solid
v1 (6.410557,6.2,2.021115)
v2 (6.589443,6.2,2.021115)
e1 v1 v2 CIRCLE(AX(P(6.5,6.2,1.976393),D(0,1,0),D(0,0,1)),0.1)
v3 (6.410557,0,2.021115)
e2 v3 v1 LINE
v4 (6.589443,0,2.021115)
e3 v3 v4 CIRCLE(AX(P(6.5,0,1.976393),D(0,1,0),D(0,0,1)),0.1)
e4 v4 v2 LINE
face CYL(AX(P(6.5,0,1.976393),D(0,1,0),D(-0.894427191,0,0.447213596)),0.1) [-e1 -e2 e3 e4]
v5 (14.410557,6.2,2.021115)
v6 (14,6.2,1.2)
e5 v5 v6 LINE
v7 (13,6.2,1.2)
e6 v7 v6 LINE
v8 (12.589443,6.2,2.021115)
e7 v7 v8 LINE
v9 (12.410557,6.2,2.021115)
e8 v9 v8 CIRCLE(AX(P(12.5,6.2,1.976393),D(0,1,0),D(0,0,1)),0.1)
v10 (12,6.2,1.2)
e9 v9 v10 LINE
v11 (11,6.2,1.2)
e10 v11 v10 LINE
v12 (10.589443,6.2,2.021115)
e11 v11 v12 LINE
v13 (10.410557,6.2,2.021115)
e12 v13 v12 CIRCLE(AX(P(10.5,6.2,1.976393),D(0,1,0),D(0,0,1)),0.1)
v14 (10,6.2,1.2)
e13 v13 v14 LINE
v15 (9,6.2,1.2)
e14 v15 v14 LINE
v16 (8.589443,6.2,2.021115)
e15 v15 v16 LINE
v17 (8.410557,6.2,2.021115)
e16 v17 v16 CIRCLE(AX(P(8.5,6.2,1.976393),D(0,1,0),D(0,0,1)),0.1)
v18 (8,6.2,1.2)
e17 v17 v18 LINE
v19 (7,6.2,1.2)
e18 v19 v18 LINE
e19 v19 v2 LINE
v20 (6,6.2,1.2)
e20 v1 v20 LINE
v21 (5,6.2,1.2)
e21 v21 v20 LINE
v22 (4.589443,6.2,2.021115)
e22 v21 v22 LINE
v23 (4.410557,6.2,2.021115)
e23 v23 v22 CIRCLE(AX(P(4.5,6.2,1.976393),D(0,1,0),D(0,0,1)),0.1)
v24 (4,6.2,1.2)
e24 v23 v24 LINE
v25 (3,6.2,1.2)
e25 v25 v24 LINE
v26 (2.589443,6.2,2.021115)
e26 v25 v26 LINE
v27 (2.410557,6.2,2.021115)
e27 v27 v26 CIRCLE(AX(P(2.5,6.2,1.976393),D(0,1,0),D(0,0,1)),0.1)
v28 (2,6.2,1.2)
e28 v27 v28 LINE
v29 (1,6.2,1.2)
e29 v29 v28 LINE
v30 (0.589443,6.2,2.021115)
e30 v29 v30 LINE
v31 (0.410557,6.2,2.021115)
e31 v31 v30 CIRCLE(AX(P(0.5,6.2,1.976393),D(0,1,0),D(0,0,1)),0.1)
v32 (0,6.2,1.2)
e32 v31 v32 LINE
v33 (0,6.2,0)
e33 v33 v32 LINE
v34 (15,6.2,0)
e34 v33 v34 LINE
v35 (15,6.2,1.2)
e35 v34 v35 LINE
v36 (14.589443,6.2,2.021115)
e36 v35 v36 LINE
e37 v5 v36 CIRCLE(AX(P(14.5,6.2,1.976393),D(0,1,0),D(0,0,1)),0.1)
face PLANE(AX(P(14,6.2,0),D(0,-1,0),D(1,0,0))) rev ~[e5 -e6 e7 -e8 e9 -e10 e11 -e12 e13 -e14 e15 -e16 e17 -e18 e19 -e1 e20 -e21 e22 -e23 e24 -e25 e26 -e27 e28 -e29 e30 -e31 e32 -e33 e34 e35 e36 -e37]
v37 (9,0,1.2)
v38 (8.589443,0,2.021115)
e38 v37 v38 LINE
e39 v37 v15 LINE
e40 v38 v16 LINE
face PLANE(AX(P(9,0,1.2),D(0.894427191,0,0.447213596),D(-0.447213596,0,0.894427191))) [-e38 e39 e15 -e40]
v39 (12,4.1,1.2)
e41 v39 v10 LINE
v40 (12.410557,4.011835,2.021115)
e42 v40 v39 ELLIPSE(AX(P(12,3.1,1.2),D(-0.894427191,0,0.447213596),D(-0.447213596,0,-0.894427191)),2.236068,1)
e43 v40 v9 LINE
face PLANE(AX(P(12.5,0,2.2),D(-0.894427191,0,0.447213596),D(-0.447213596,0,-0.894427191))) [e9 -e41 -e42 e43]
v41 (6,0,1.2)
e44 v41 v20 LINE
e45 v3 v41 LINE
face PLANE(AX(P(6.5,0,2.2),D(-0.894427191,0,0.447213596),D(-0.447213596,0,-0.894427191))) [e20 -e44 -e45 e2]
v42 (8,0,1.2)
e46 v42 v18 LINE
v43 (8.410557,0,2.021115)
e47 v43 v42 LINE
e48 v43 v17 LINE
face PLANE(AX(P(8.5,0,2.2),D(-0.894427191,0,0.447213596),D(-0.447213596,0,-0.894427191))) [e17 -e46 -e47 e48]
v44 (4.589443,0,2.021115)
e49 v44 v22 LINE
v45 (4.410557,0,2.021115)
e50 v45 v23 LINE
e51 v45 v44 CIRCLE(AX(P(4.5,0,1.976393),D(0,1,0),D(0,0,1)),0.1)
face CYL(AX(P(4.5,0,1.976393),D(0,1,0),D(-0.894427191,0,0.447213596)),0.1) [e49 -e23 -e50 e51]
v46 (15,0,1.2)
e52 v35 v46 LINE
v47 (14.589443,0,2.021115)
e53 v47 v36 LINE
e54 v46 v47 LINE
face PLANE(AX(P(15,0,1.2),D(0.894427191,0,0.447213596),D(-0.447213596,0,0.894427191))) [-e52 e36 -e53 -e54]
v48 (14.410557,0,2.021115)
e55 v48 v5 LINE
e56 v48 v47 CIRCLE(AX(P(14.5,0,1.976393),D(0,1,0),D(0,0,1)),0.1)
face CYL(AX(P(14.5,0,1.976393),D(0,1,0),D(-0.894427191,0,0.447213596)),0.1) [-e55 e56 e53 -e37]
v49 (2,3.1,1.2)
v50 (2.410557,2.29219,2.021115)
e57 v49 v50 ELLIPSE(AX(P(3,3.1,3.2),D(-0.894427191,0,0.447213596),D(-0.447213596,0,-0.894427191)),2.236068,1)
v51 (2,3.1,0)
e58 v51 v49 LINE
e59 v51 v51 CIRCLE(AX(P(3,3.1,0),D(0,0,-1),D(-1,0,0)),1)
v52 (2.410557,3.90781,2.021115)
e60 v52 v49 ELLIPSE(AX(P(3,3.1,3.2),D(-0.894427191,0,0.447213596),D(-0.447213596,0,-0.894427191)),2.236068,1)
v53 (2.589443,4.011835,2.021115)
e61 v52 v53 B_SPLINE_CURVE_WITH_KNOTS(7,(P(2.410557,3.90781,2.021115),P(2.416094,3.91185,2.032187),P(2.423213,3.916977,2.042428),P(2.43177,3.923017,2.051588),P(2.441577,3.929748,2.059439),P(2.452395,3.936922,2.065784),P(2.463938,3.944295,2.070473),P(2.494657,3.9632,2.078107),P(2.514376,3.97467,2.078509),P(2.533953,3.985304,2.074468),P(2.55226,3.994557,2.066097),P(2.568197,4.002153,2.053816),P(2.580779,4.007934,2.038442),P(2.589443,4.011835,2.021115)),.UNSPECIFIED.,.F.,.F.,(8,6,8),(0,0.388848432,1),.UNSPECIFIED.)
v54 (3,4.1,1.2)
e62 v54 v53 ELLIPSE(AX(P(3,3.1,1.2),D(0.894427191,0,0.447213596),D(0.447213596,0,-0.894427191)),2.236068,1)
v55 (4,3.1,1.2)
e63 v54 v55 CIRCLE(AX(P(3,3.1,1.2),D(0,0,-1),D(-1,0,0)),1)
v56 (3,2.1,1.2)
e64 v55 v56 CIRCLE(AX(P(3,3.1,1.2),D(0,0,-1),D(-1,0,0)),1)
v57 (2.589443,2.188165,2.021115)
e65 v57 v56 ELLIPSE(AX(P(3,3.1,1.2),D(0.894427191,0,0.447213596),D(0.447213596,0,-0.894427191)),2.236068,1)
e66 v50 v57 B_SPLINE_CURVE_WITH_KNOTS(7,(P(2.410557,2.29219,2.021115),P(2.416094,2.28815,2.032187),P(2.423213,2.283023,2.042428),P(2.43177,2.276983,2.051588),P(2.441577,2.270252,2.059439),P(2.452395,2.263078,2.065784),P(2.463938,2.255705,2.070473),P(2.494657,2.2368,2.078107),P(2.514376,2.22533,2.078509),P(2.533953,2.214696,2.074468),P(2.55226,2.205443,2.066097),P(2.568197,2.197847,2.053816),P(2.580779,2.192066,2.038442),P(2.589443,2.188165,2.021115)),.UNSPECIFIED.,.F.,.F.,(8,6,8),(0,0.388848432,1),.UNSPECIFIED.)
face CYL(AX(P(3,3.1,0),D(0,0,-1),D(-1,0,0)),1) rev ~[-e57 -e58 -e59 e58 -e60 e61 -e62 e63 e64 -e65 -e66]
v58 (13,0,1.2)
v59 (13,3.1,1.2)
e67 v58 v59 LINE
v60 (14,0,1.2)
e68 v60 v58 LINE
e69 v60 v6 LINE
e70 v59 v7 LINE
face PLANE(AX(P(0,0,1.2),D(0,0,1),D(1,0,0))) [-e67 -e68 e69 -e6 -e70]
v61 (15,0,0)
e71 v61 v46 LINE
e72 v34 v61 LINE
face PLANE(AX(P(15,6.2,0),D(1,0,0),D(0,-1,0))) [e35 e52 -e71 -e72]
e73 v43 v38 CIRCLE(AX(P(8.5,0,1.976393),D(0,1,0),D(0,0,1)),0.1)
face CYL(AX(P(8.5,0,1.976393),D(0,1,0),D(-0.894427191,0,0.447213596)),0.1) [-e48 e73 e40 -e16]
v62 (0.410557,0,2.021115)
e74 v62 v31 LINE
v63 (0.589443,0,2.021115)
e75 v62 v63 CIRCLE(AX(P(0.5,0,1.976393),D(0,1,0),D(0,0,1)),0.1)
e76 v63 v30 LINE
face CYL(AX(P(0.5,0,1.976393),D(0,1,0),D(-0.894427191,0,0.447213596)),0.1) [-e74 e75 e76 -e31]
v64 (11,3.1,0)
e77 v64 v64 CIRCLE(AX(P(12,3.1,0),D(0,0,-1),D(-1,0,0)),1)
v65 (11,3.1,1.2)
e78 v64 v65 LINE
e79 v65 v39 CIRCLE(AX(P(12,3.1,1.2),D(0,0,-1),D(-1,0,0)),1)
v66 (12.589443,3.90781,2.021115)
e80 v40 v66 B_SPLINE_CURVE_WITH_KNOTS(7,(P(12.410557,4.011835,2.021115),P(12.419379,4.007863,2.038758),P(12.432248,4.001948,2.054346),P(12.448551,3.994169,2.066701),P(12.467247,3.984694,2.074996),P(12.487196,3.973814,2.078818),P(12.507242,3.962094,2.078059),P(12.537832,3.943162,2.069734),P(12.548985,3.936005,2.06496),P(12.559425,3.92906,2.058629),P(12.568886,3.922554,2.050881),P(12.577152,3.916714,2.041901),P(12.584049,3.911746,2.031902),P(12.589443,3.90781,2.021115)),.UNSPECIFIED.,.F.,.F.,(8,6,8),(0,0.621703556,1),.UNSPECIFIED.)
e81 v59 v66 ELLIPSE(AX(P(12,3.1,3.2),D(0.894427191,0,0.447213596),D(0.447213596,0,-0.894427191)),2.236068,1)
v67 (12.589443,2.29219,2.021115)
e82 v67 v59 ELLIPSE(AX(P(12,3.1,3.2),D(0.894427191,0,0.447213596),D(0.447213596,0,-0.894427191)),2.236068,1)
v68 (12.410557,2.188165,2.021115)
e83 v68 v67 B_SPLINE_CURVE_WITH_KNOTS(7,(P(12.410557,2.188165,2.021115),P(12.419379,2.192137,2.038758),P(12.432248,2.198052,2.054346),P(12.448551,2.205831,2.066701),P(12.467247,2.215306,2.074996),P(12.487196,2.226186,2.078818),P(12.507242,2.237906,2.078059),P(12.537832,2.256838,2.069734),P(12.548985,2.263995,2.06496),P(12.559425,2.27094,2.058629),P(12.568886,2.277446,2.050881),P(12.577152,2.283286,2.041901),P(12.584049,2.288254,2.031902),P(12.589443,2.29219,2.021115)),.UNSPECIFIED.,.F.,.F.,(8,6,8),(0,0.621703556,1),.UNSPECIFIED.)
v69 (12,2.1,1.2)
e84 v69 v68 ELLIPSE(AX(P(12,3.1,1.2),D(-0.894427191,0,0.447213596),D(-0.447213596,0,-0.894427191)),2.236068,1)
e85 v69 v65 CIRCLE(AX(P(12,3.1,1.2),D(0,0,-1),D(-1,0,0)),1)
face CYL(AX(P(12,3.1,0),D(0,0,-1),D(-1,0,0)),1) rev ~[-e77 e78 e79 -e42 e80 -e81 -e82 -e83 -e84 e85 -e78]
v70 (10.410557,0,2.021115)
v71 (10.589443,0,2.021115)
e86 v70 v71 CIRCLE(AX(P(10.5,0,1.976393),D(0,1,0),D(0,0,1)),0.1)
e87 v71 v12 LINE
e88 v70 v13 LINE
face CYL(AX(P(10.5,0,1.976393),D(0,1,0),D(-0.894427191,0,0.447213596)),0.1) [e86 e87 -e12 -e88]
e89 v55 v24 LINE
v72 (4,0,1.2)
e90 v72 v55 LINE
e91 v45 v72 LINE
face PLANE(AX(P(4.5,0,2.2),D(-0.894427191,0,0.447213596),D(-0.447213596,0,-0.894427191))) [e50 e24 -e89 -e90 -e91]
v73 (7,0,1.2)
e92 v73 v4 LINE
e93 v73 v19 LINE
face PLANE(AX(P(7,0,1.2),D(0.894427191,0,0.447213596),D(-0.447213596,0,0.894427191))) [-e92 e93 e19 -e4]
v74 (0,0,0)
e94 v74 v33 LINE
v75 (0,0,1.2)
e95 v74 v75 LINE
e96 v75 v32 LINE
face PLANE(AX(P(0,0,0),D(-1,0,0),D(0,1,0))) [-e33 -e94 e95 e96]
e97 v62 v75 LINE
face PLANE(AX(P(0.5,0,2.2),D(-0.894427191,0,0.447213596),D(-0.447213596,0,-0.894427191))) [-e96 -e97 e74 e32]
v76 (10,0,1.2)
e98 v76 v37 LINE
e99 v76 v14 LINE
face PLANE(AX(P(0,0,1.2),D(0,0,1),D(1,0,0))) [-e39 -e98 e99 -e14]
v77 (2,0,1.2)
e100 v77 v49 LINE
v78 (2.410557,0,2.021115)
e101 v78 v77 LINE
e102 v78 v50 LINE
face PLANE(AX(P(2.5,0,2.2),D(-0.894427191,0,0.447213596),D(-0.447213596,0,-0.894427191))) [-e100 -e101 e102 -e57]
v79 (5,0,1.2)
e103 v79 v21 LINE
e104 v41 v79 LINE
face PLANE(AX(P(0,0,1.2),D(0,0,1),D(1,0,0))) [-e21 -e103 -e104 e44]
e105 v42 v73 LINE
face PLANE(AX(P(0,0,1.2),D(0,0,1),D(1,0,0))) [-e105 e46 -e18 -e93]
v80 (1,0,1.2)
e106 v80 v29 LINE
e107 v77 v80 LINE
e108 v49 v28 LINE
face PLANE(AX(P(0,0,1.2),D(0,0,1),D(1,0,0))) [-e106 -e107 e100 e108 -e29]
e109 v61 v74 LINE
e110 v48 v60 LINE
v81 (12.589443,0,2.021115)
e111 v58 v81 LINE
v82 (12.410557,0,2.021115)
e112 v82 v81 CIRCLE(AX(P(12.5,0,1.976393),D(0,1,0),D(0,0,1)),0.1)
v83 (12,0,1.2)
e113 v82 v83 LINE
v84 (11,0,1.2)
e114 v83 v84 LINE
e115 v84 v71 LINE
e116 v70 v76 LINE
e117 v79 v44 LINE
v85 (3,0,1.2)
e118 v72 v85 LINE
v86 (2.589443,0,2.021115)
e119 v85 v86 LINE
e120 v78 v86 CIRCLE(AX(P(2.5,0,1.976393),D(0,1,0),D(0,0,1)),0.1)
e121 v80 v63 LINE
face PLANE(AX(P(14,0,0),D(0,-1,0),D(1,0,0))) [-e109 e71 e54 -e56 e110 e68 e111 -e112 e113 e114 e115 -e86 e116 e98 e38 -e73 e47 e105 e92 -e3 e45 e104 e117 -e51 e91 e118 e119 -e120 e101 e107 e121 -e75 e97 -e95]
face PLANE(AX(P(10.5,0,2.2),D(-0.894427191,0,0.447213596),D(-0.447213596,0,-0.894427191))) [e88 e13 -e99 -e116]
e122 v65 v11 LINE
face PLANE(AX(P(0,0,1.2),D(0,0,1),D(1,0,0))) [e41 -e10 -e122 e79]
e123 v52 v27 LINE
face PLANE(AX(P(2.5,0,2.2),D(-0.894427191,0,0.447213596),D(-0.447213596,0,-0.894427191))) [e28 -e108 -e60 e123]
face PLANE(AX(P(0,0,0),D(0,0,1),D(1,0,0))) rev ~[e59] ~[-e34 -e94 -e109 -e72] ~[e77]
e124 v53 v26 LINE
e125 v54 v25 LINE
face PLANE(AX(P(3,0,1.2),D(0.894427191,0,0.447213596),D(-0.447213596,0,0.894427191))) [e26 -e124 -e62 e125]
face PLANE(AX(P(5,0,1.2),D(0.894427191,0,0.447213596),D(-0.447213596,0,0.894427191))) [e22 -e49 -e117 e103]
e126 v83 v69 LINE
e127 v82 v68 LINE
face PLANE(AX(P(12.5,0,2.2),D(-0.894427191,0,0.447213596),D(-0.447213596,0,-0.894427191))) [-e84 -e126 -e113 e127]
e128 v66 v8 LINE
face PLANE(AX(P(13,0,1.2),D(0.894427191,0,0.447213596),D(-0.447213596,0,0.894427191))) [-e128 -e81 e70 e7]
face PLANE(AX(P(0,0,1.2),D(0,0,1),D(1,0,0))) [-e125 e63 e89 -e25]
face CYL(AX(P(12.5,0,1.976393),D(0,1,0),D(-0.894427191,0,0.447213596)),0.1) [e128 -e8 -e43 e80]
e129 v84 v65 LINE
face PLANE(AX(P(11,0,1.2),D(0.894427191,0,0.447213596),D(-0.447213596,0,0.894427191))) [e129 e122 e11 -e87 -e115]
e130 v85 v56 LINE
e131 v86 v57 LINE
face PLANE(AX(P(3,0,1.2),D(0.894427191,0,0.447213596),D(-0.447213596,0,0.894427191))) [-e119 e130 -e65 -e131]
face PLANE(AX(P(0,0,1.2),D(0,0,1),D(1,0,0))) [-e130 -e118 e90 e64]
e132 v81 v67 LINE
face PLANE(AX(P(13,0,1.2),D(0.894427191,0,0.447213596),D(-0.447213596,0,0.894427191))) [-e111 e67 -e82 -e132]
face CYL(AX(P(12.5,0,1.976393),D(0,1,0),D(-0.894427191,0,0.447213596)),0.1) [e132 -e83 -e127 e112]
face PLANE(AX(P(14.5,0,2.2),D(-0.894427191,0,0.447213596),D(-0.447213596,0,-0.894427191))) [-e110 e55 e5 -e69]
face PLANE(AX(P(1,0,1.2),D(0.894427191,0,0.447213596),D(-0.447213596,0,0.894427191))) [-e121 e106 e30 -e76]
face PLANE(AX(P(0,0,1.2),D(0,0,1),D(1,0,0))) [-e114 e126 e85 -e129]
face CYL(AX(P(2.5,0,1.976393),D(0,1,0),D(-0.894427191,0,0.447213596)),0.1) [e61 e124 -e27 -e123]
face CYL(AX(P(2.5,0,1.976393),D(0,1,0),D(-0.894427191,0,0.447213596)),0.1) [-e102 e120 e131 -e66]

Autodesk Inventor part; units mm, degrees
ref_plane "YZ Plane" through (0, 0, 0) normal (1, 0, 0) x (0, 1, 0)
ref_plane "XZ Plane" through (0, 0, 0) normal (0, 1, 0) x (-1, 0, 0)
ref_plane "XY Plane" through (0, 0, 0) normal (0, 0, 1) x (1, 0, 0)
sketch "Sketch1" plane through (0, 0, 0) normal (0, 0, 1) x (1, 0, 0)
  line L0 (0, 0) -> (0, 6.2)
  line L1 (0, 6.2) -> (15, 6.2)
  line L2 (15, 6.2) -> (15, 0)
  line L3 (15, 0) -> (0, 0)
  dimension "d0" = 6.2
  dimension "d1" = 15
extrude "Extrusion1" add sketch "Sketch1" along normal blind 1.2
sketch "Sketch2" plane through (0, 0, 0) normal (0, -1, 0) x (1, 0, 0)
  line L0 (0, 0) -> (0, 1.2) projected
  line L1 (0, 1.2) -> (0.5, 1.2)
  line L2 (15, 1.2) -> (0, 1.2) projected
  line L3 (0.5, 1.2) -> (0.5, 2.2)
  line L4 (0.5, 2.2) -> (0, 1.2)
  line L5 (0.5, 1.2) -> (1, 1.2)
  line L6 (1, 1.2) -> (0.5, 2.2)
  dimension "d4" = 0.5
  dimension "d5" = 1
  dimension "d6" = 0.5
extrude "Extrusion2" add sketch "Sketch2" against normal blind 6.2
fillet "Fillet1" radius 0.1 1 edges at (0.5, 3.1, 2.2)
pattern_linear "Rectangular Pattern1" count 8 spacing 2 along (1, 0, 0) of "Fillet1", "Extrusion2"
sketch "Sketch3" plane through (0, 0, 0) normal (0, 0, -1) x (-1, 0, 0)
  circle A0 centre (-3, 3.1) radius 1
  circle A1 centre (-12, 3.1) radius 1
  line L0 (0, 6.2) -> (0, 0) projected
  line L1 (-15, 0) -> (-15, 6.2) projected
  dimension "d13" = 2
  dimension "d14" = 2
  dimension "d15" = 3
  dimension "d16" = 3
extrude "Extrusion3" cut sketch "Sketch3" against normal blind 6.2
properties part number "time belt coupling"
